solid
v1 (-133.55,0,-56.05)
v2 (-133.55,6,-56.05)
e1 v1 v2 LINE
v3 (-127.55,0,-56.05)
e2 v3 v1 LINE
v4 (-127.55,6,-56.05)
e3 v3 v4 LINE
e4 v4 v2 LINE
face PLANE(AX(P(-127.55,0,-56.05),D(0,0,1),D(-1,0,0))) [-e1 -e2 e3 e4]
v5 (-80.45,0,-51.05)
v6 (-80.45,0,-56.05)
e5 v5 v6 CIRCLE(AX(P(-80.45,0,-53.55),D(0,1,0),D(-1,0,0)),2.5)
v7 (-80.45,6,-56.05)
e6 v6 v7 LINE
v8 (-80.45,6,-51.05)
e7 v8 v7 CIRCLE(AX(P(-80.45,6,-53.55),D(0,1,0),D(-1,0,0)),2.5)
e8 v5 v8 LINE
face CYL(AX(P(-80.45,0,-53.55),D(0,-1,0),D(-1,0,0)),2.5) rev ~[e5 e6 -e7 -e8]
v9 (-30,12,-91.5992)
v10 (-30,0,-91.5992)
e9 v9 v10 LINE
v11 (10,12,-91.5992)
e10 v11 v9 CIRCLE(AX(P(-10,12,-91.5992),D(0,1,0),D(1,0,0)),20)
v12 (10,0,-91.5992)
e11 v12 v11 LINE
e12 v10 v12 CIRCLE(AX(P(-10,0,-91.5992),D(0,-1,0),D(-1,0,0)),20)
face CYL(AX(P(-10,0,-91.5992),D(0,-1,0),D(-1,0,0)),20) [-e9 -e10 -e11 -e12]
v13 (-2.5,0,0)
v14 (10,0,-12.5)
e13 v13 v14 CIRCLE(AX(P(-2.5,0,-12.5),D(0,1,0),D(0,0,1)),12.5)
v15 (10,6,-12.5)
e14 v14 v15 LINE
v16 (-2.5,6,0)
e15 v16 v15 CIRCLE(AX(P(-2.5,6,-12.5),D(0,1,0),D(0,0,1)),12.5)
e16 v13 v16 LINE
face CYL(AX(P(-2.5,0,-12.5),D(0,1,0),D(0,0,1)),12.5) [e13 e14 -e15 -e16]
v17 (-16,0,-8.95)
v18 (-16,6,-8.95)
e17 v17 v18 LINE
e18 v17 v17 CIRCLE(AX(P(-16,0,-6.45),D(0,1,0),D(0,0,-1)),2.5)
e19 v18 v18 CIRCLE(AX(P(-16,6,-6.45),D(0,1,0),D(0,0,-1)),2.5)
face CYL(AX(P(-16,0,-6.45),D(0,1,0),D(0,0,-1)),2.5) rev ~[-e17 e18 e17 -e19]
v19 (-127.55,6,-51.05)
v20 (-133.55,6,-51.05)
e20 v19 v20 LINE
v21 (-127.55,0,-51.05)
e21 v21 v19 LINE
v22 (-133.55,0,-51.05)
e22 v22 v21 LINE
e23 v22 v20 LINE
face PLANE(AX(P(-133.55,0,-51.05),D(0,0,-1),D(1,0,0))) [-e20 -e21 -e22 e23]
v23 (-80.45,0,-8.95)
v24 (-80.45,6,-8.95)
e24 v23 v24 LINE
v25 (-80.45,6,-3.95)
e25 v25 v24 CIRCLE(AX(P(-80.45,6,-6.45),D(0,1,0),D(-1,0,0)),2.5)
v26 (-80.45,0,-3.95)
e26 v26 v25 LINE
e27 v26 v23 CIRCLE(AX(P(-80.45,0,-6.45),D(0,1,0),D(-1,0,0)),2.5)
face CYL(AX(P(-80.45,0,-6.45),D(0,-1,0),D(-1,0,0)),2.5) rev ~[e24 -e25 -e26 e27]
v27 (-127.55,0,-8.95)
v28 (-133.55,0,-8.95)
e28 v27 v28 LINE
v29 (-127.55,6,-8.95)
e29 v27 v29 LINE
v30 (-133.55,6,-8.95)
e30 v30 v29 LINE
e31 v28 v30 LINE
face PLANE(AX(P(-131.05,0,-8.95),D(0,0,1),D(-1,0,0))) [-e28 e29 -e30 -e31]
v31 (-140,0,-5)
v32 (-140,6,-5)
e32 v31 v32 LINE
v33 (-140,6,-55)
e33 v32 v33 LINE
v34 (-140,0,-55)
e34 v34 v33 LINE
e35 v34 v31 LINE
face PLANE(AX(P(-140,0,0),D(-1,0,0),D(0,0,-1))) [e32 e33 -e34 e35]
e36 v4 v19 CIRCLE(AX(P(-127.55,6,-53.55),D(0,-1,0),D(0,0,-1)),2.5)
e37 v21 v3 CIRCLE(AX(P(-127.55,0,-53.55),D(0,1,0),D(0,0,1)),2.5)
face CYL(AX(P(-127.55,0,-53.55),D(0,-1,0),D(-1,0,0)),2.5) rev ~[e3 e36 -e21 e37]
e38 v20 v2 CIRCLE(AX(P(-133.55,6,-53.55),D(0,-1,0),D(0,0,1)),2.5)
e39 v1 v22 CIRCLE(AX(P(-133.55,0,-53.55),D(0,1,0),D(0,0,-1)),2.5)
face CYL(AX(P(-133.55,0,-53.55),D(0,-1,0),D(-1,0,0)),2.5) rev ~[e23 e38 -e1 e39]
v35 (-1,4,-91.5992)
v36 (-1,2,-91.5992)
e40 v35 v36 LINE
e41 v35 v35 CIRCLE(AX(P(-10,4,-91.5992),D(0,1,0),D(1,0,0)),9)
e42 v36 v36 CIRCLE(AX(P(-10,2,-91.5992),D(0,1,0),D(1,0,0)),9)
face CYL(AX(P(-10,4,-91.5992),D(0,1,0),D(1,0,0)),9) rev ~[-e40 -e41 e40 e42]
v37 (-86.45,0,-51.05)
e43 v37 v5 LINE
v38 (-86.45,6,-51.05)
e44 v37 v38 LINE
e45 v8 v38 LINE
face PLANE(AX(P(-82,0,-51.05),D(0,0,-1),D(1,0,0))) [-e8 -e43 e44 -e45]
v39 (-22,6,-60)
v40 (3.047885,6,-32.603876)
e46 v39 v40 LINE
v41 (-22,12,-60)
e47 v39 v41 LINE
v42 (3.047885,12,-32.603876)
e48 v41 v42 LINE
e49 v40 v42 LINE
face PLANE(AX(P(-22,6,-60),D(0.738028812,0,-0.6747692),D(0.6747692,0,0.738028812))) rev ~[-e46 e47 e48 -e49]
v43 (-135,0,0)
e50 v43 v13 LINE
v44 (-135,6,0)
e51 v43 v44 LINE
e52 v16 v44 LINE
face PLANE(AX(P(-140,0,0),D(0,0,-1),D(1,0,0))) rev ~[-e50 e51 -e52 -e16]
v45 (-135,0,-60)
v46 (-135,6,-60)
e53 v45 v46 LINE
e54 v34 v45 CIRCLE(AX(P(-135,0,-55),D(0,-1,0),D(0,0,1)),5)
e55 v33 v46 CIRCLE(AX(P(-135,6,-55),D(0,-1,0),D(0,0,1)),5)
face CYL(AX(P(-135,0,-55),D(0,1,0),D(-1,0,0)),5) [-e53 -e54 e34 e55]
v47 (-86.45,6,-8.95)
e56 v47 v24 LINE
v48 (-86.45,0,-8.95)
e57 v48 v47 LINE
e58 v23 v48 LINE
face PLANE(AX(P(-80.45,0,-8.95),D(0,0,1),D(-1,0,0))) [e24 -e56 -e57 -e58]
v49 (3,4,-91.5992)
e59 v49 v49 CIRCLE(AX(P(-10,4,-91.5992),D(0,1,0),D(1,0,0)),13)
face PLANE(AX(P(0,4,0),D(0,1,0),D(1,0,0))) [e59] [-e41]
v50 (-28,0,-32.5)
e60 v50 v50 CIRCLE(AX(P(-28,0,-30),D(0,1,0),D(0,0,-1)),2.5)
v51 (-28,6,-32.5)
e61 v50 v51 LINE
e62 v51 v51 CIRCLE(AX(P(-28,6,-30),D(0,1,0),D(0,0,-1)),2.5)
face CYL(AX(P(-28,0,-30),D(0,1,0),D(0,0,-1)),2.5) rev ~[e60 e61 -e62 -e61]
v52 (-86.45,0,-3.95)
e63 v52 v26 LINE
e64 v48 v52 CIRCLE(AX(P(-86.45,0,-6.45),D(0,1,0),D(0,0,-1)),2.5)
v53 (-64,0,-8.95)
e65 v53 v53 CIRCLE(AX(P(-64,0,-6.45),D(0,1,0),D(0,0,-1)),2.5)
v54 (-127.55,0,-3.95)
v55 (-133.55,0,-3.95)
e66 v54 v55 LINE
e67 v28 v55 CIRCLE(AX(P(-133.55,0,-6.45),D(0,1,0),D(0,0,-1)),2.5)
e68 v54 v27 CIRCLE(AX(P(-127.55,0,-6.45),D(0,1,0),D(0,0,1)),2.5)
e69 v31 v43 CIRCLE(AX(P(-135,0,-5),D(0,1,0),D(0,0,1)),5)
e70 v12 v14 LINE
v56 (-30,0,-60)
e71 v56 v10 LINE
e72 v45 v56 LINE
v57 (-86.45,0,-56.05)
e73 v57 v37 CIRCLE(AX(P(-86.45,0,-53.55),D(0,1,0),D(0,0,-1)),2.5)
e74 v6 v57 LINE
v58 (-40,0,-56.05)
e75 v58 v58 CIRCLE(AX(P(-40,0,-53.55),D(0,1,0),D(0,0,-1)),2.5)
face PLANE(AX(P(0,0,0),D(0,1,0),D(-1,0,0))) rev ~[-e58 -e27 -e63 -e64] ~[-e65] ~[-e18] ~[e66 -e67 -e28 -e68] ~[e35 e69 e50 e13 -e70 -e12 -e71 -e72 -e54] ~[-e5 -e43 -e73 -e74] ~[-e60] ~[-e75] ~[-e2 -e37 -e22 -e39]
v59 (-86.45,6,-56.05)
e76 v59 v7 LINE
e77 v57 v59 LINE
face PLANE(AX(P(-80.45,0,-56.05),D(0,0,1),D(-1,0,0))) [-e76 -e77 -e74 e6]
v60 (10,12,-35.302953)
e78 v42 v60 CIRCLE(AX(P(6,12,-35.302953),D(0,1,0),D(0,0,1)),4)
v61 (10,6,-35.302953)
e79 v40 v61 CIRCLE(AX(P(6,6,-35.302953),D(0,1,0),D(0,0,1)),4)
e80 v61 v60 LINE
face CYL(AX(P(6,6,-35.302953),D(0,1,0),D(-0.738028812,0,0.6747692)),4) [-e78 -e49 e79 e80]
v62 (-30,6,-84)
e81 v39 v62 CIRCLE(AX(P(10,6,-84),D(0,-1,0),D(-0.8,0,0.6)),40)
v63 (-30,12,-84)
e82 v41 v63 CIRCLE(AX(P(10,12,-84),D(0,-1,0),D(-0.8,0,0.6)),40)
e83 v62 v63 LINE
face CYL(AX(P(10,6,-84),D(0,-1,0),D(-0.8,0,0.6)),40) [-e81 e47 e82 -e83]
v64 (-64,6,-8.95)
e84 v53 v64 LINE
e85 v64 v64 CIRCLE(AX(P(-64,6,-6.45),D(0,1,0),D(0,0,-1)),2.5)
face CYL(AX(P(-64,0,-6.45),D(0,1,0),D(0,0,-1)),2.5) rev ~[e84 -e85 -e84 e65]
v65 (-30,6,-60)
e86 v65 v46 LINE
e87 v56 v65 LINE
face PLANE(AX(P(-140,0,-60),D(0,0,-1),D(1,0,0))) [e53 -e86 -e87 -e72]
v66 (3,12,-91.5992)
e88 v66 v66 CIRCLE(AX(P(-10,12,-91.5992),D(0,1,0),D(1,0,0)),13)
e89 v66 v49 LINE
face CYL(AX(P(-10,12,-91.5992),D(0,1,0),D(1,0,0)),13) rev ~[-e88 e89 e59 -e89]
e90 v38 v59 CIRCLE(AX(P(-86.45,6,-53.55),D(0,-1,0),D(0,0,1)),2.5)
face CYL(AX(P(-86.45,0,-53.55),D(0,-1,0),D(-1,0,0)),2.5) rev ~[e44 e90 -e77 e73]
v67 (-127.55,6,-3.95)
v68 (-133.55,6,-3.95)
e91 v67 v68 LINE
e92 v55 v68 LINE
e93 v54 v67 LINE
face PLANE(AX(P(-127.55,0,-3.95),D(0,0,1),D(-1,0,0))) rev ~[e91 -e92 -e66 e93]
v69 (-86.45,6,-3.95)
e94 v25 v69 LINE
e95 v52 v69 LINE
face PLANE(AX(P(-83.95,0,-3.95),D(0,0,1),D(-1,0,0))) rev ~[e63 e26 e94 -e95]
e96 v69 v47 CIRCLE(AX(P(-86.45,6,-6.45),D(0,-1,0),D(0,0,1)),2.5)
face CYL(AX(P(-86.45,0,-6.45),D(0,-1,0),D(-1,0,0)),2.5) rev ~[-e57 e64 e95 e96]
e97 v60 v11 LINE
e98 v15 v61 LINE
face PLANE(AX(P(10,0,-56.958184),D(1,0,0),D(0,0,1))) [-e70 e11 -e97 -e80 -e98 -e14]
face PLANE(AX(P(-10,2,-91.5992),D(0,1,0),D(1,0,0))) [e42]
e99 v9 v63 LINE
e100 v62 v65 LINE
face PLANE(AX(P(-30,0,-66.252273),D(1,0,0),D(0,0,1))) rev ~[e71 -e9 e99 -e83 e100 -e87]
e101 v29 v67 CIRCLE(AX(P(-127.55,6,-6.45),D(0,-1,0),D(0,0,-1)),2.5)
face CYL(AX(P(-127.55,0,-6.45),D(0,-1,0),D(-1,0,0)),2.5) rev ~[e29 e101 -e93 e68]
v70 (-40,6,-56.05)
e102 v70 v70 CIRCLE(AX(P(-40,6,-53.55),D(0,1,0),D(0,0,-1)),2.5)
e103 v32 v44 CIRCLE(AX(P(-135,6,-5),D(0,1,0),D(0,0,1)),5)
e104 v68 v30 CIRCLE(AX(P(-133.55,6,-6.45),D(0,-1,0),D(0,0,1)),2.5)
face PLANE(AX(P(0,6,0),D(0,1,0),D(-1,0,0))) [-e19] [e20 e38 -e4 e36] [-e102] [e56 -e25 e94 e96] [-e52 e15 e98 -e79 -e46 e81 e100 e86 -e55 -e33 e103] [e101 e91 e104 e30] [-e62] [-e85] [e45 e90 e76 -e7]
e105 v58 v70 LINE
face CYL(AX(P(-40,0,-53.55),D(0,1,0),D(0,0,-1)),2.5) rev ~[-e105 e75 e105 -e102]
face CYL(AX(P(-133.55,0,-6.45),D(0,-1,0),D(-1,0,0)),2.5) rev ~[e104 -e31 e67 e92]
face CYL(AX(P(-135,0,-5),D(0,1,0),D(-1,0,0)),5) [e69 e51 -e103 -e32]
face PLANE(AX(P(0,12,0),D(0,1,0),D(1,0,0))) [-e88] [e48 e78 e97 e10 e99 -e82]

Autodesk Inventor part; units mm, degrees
ref_plane "YZ Plane" through (0, 0, 0) normal (1, 0, 0) x (0, 1, 0)
ref_plane "XZ Plane" through (0, 0, 0) normal (0, 1, 0) x (-1, 0, 0)
ref_plane "XY Plane" through (0, 0, 0) normal (0, 0, 1) x (1, 0, 0)
sketch "Sketch1" plane through (0, 0, 0) normal (0, 1, 0) x (-1, 0, 0)
  line L0 (140, 0) -> (74, 0)
  line L1 (74, 0) -> (76, 0)
  line L2 (140, 0) -> (140, -60)
  line L3 (140, -60) -> (140, 0)
  line L4 (138, -58) -> (82, -2)
  line L5 (82, -58) -> (138, -2)
  line L6 (110, -30) -> (110, -49.4)
  line L7 (86.45, -6.45) -> (86.45, -53.55)
  line L8 (82, -58) -> (82, -2)
  line L9 (76, -58) -> (76, -2)
  line L10 (74, 0) -> (74, -60)
  line L11 (74, 0) -> (74, -60)
  circle A0 centre (86.45, -6.45) radius 2.5
  line L12 (76, -2) -> (138, -2)
  line L13 (80.45, -8.95) -> (133.55, -8.95)
  line L14 (80.45, -3.95) -> (133.55, -3.95)
  line L15 (133.55, -6.45) -> (86.45, -6.45)
  line L16 (82, -2) -> (138, -2)
  line L17 (104, -10.6) -> (110, -10.6)
  line L18 (138, -2) -> (138, -58)
  line L19 (138, -2) -> (138, -58)
  line L20 (133.55, -53.55) -> (133.55, -6.45)
  line L21 (140, -60) -> (138, -60)
  line L22 (138, -60) -> (138, -58)
  line L23 (138, -58) -> (140, -58)
  line L24 (140, -58) -> (140, -60)
  line L25 (104, -49.4) -> (110, -49.4)
  circle A1 centre (86.45, -53.55) radius 2.5
  line L26 (133.55, -51.05) -> (80.45, -51.05)
  line L27 (86.45, -53.55) -> (133.55, -53.55)
  line L28 (80.45, -56.05) -> (133.55, -56.05)
  line L29 (138, -58) -> (82, -58)
  line L30 (138, -58) -> (76, -58)
  line L31 (74, -60) -> (140, -60)
  line L32 (140, -60) -> (32, -60)
  circle A2 centre (127.55, -53.55) radius 2.5
  line L33 (104, -30) -> (104, -49.4)
  circle A3 centre (80.45, -6.45) radius 2.5
  line L34 (86.45, -53.55) -> (82, -53.55)
  line L35 (82, -58) -> (86.45, -58)
  line L36 (86.45, -58) -> (86.45, -53.55)
  line L37 (82, -53.55) -> (82, -58)
  circle A4 centre (80.45, -53.55) radius 2.5
  circle A5 centre (133.55, -53.55) radius 2.5
  line L38 (76, 0) -> (76, -2)
  line L39 (76, -2) -> (74, -2)
  line L40 (74, -2) -> (74, 0)
  line L41 (138, -2) -> (133.55, -2)
  line L42 (133.55, -2) -> (133.55, -6.45)
  line L43 (133.55, -6.45) -> (138, -6.45)
  line L44 (138, -6.45) -> (138, -2)
  circle A6 centre (127.55, -6.45) radius 2.5
  circle A7 centre (133.55, -6.45) radius 2.5
  line L45 (0, -25) -> (0, 0)
  line L46 (32, -60) -> (0, -25)
  line L47 (0, -25) -> (0, 0)
  line L48 (0, 0) -> (74, 0)
  line L49 (0, 0) -> (74, 0)
  line L50 (140, -60) -> (140, 0)
  line L51 (140, -60) -> (0, -60)
  line L52 (0, -60) -> (0, 0)
  line L53 (0, 0) -> (140, 0)
  line L54 (140, 0) -> (140, -60)
  line L55 (0, -60) -> (40, -60)
  line L56 (40, -60) -> (40, -100)
  line L57 (40, -100) -> (0, -100)
  line L58 (0, -100) -> (0, -60)
  line L59 (140, 0) -> (74, 0)
  line L60 (74, 0) -> (76, 0)
  line L61 (140, 0) -> (140, -60)
  line L62 (140, -60) -> (140, 0)
  line L63 (138, -58) -> (82, -2)
  line L64 (82, -58) -> (138, -2)
  circle A8 centre (110, -30) radius 19.4
  circle A9 centre (104, -30) radius 19.4
  line L65 (110, -30) -> (110, -49.4)
  line L66 (86.45, -6.45) -> (86.45, -53.55)
  line L67 (82, -58) -> (82, -2)
  line L68 (76, -58) -> (76, -2)
  line L69 (74, 0) -> (74, -60)
  line L70 (74, 0) -> (74, -60)
  circle A10 centre (86.45, -6.45) radius 2.5
  line L71 (76, -2) -> (138, -2)
  line L72 (80.45, -8.95) -> (133.55, -8.95)
  line L73 (80.45, -3.95) -> (133.55, -3.95)
  line L74 (133.55, -6.45) -> (86.45, -6.45)
  line L75 (82, -2) -> (138, -2)
  line L76 (104, -10.6) -> (110, -10.6)
  line L77 (138, -2) -> (138, -58)
  line L78 (138, -2) -> (138, -58)
  line L79 (133.55, -53.55) -> (133.55, -6.45)
  line L80 (140, -60) -> (138, -60)
  line L81 (138, -60) -> (138, -58)
  line L82 (138, -58) -> (140, -58)
  line L83 (140, -58) -> (140, -60)
  line L84 (104, -49.4) -> (110, -49.4)
  circle A11 centre (86.45, -53.55) radius 2.5
  line L85 (133.55, -51.05) -> (80.45, -51.05)
  line L86 (86.45, -53.55) -> (133.55, -53.55)
  line L87 (80.45, -56.05) -> (133.55, -56.05)
  line L88 (138, -58) -> (82, -58)
  line L89 (138, -58) -> (76, -58)
  line L90 (74, -60) -> (140, -60)
  line L91 (140, -60) -> (32, -60)
  circle A12 centre (127.55, -53.55) radius 2.5
  line L92 (104, -30) -> (104, -49.4)
  circle A13 centre (80.45, -6.45) radius 2.5
  line L93 (86.45, -53.55) -> (82, -53.55)
  line L94 (82, -58) -> (86.45, -58)
  line L95 (86.45, -58) -> (86.45, -53.55)
  line L96 (82, -53.55) -> (82, -58)
  circle A14 centre (80.45, -53.55) radius 2.5
  circle A15 centre (133.55, -53.55) radius 2.5
  line L97 (76, 0) -> (76, -2)
  line L98 (76, -2) -> (74, -2)
  line L99 (74, -2) -> (74, 0)
  line L100 (138, -2) -> (133.55, -2)
  line L101 (133.55, -2) -> (133.55, -6.45)
  line L102 (133.55, -6.45) -> (138, -6.45)
  line L103 (138, -6.45) -> (138, -2)
  circle A16 centre (127.55, -6.45) radius 2.5
  circle A17 centre (133.55, -6.45) radius 2.5
  line L104 (0, -25) -> (0, 0)
  line L105 (32, -60) -> (0, -25)
  line L106 (0, -25) -> (0, 0)
  line L107 (0, 0) -> (74, 0)
  line L108 (0, 0) -> (74, 0)
  line L109 (140, -60) -> (140, 0)
  line L110 (140, -60) -> (0, -60)
  line L111 (0, -60) -> (0, 0)
  line L112 (0, 0) -> (140, 0)
  line L113 (140, 0) -> (140, -60)
  line L114 (0, -60) -> (40, -60)
  line L115 (40, -60) -> (40, -100)
  line L116 (40, -100) -> (0, -100)
  line L117 (0, -100) -> (0, -60)
  line L118 (40, -100) -> (0, -60)
  line L119 (40, -60) -> (0, -100)
  circle A18 centre (104, -30) radius 10.5
  line L120 (0, -68.6498) -> (0, 0)
  line L121 (20, -80) -> (20, -180)
  line L122 (104, -30) -> (-49.3689, -120.7578)
  circle A19 centre (20, -80) radius 17
  line L123 (20, -134.4641) -> (10, -134.4641)
  line L124 (10, -134.4641) -> (10, -50)
  line L125 (10, -50) -> (20, -50)
  line L126 (20, -50) -> (20, -134.4641)
  circle A20 centre (10, -91.5992) radius 40
  circle A21 centre (10, -91.5992) radius 20
  line L127 (10, -95.8192) -> (-10, -95.8192)
  line L128 (-10, -95.8192) -> (-10, 0)
  line L129 (-10, 0) -> (10, 0)
  line L130 (10, 0) -> (10, -95.8192)
  line L131 (-10, -95.8192) -> (30, -95.8192)
  line L132 (30, -95.8192) -> (30, 0)
  line L133 (30, 0) -> (-10, 0)
  line L134 (-10, 0) -> (-10, -95.8192)
  line L135 (10, -95.8192) -> (10, -91.5992)
  line L136 (10, -91.5992) -> (9.1265, -91.5992)
  point P0 (127.55, 3.95)
  point P1 (127.55, 8.95)
  point P2 (86.45, 3.95)
  point P3 (86.45, 8.95)
  point P4 (127.55, 56.05)
  point P5 (127.55, 51.05)
  point P6 (86.45, 56.05)
  point P7 (86.45, 51.05)
  point P8 (123.7179, -16.2821)
  point P9 (131.05, -8.95)
  point P10 (88.95, -8.95)
  point P11 (88.2178, -8.2178)
  point P12 (86.45, -8.95)
  point P13 (82, -3.95)
  point P14 (135.3178, -55.3178)
  point P15 (127.55, -56.05)
  point P16 (127.55, -51.05)
  point P17 (131.05, -51.05)
  point P18 (123.7179, -43.7179)
  point P19 (86.45, -51.05)
  point P20 (86.45, -56.05)
  point P21 (86.45, -3.95)
  point P22 (127.55, -8.95)
  point P23 (127.55, -3.95)
  point P24 (86.45, -8.95)
  point P25 (86.45, -3.95)
  point P26 (127.55, -56.05)
  point P27 (127.55, -51.05)
  point P28 (127.55, -8.95)
  point P29 (127.55, -3.95)
  point P30 (86.45, -51.05)
  point P31 (86.45, -56.05)
  point P32 (127.55, 3.95)
  point P33 (127.55, 8.95)
  point P34 (86.45, 3.95)
  point P35 (86.45, 8.95)
  point P36 (127.55, 56.05)
  point P37 (127.55, 51.05)
  point P38 (86.45, 56.05)
  point P39 (86.45, 51.05)
  point P40 (123.7179, -16.2821)
  point P41 (131.05, -8.95)
  point P42 (88.95, -8.95)
  point P43 (88.2178, -8.2178)
  point P44 (86.45, -8.95)
  point P45 (82, -3.95)
  point P46 (135.3178, -55.3178)
  point P47 (127.55, -56.05)
  point P48 (127.55, -51.05)
  point P49 (131.05, -51.05)
  point P50 (123.7179, -43.7179)
  point P51 (86.45, -51.05)
  point P52 (86.45, -56.05)
  point P53 (86.45, -3.95)
  point P54 (127.55, -8.95)
  point P55 (127.55, -3.95)
  point P56 (30, -60)
  point P57 (88.95, -51.05)
  point P58 (88.2178, -51.7822)
  point P59 (88.2178, -8.2178)
  point P60 (88.95, -8.95)
  point P61 (-10, -91.5992)
  point P62 (30, -91.5992)
  point P63 (30, -60)
  point P64 (104.0094, -10.6)
  point P65 (109.9957, -10.6)
  dimension "d0" = 40
  dimension "d1" = 40
  dimension "d43" = 40
  dimension "d44" = 40
  dimension "d45" = 21
  dimension "d46" = 100
  dimension "d47" = 34
  dimension "d48" = 10
  dimension "d49" = 80
  dimension "d50" = 40
  dimension "d51" = 20
  dimension "d81" = 4.22
extrude "Extrusion5" add sketch "Sketch1" along normal blind 6 contours L2 L23 L18 L12 L38 L0 | L38 L39 L10 L0 | L2 L21 L22 L23 | L10 L122 L32 A20 L132 L48 | L12 L8 L14 A3 L13 L122 L9 | L9 L122 L10 L39 | L29 L36 L28 A5 L4 | L4 A5 L20 A7 L43 L18 | L22 L31 L10 L122 L9 L30 L29 | L132 A20 L46 L130 L48 | L122 L8 L26 A4 L28 L30 L9 | L12 L42 L14 L4 | L4 L14 L8 | L43 A7 L5 L18 | L29 L5 L28 L36 | L10 L32 L122 | L130 L46 L45 L48 | L132 L46 A20 | A20 L32 L46 L132 | L122 L7 L26 L8 | L8 L13 L7 A9 L122 | L12 L5 A7 L42 | L8 L28 L5 | A1 L27 A2 L28 | L45 L52 A20 L128 L129 | L130 L124 A20 L52 L46 | L46 A20 L126 L125 L130 | L46 L132 L51 L126 A20 | L46 L51 L132 | L122 A9 L5 L26 L7 | L7 A9 L122 | L14 A6 L15 A0 | L26 L4 A8 L5 L13 L20 | A1 L5 L26 A2 L27 | L125 L126 A20 L124 | L126 L51 L124 A20 | L132 A19 L126 L51 | L26 L5 A1 | L13 L4 A9 L7 | A0 L4 L13 | A9 L7 | L7 A9 L4 A8 L122 | L122 A8 L5 A9 | L15 A6 L13 L4 A0 | L26 L5 A9 L25 A8 L4 | L5 A8 L17 A9 L4 L13 | A20 L124 L51 L52 | L52 L58 A21 L128 A20 | L126 A19 L124 L51 | L132 L119 A21 L126 A19 | L5 A8 L33 A9 | L122 A18 L5 A8 | A8 L4 A18 L122 | A8 L6 A9 L4 | L4 A9 L5 A8 | L5 A9 A8 | L118 A19 A21 L58 | L51 L124 A19 L118 | A21 L58 L122 L127 | L132 L122 A21 L119 | L126 A21 L118 L124 A19 | A9 A8 L4 | L5 A18 L33 A8 | A9 A8 L25 | L33 A8 A9 | A8 A9 L5 A18 L4 | L122 L33 L5 A18 | A18 L4 L5 L33 L122 | A9 L6 A18 L4 | L4 A18 L5 A9 | A8 A9 L6 | A8 A9 L17 | A21 L121 L57 | L57 L121 A19 L131 A21 | L132 L118 A21 L122 | A21 L124 L57 L121 | A19 L124 L118 | L118 L124 A21 A19 | A21 L127 L122 | L122 L127 L58 L57 L124 A21 | A21 A19 L122 L58 | A21 L122 L119 | L119 L122 L126 A21 | L126 L122 L118 A21 | L5 L33 A18 | L33 A18 L6 A9 A8 | A18 L5 L4 | A18 L6 L4 | L4 L5 A18 | L57 L124 L131 A19 L121 | L131 A19 A21 | L132 A21 L118 | A21 L118 L119 L122 | L118 A21 L124 | A21 L124 L122 A19 | L122 L58 L127 | L122 A19 L119 L127 L58 | L119 L126 L122 | L126 L118 L122 | L118 L122 L124 A21 | L5 L6 A18 L33 | L57 L119 L127 L124 | A19 L131 L121 | L121 L131 A19 | A19 L131 L121 L118 A21 | L122 L124 L119 A19 | L127 L119 L58 | L119 L124 L122 L118 | L121 L131 A19 L124 L119 | L127 L119 A19 L124 | L124 A19 L131 | L119 L124 A19
sketch "Sketch7" plane through (0, 6, 0) normal (0, 1, 0) x (1, 0, 0)
  line L0 (0, 0) -> (-140, 0)
  line L1 (-32, 0) -> (0, 0)
  line L2 (-140, 0) -> (-140, 60)
  line L3 (-140, 60) -> (-32, 60)
  line L4 (0, 25) -> (0, 0)
  line L5 (0, 0) -> (0, 25)
  line L6 (0, 0) -> (0, 25)
  line L7 (0, 25) -> (-32, 60)
  line L8 (-32, 60) -> (10, 14.0625)
  line L9 (10, 0) -> (10, 91.5992) projected
  arc A0 (10, 91.5992) -> (-30, 91.5992) centre (-10, 91.5992) ccw projected
  circle A1 centre (-10, 91.5992) radius 20
  line L10 (-30, 91.5992) -> (-30, 60) projected
  line L11 (-30, 91.5992) -> (-30, 60)
  line L12 (-30, 60) -> (-32, 60)
  line L13 (10, 91.5992) -> (10, 14.0625)
  line L14 (0, 25) -> (0, 0)
  line L15 (135, 0) -> (-10, 0)
  line L16 (-10, 0) -> (0, 0)
  line L17 (0, 0) -> (0, 25)
  line L18 (10, 25) -> (10, 0)
  line L19 (-32, 60) -> (-22, 60)
  line L20 (-22, 60) -> (10, 25)
  line L21 (-69, 60) -> (-32, 60)
  line L22 (0, 25) -> (-32, 60)
  point P0 (6.0531, 31.6206)
fillet "Fillet10" radius 5 2 edges at (-140, 3, -60) (-140, 3, 0)
fillet "Fillet11" radius 12.5 1 edges at (10, 3, 0)
sketch "Sketch10" plane through (0, 0, 0) normal (0, -1, 0) x (1, 0, 0)
  line L0 (74, 60) -> (0, 60)
  line L1 (0, 60) -> (0, 0)
  line L2 (0, 0) -> (74, 0)
  line L3 (74, 0) -> (74, 60)
  arc A0 (80.45, 8.95) -> (80.45, 3.95) centre (80.45, 6.45) ccw
  line L4 (80.45, 6.45) -> (0, 6.45)
  arc A1 (80.45, 56.05) -> (80.45, 51.05) centre (80.45, 53.55) ccw
  line L5 (80.45, 53.55) -> (0, 53.55)
  line L6 (0, 20) -> (0, 80)
  line L7 (74, 18.2674) -> (74, 55)
  line L8 (74, 53.55) -> (64, 53.55)
  line L9 (64, 53.55) -> (64, 6.45)
  line L10 (64, 53.55) -> (40, 53.55)
  line L11 (64, 6.45) -> (40, 6.45)
  line L12 (40, 6.45) -> (16, 6.45)
  line L13 (16, 6.45) -> (40, 53.55)
  line L14 (40, 53.55) -> (28.6497, 31.2751)
  arc A2 (104, 49.4) -> (98.7489, 11.3242) centre (104, 30) ccw
  line L15 (104, 30) -> (28, 30)
  line L16 (-53.55, 64) -> (-53.55, 40)
  line L17 (-18.2674, 74) -> (-55, 74)
  line L18 (-30, 104) -> (-30, 28)
  line L19 (-53.55, 40) -> (-31.2751, 28.6497)
  line L20 (-53.55, 64) -> (-6.45, 64)
  line L21 (0, 74) -> (-60, 74)
  line L22 (-6.45, 64) -> (-6.45, 40)
  line L23 (-60, 74) -> (-60, 0)
  line L24 (-53.55, 80.45) -> (-53.55, 0)
  line L25 (-6.45, 80.45) -> (-6.45, 0)
  line L26 (0, 0) -> (0, 74)
  line L27 (-6.45, 40) -> (-6.45, 16)
  line L28 (-6.45, 16) -> (-53.55, 40)
  line L29 (-60, 0) -> (0, 0)
  arc A3 (-56.05, 80.45) -> (-51.05, 80.45) centre (-53.55, 80.45) ccw
  line L30 (-53.55, 74) -> (-53.55, 64)
  arc A4 (-8.95, 80.45) -> (-3.95, 80.45) centre (-6.45, 80.45) ccw
  line L31 (-20, 0) -> (-80, 0)
  arc A5 (-49.4, 104) -> (-11.3242, 98.7489) centre (-30, 104) ccw
  line L32 (-64, -53.55) -> (-40, -53.55)
  line L33 (-74, -18.2674) -> (-74, -55)
  line L34 (-104, -30) -> (-28, -30)
  line L35 (-40, -53.55) -> (-28.6497, -31.2751)
  line L36 (-64, -53.55) -> (-64, -6.45)
  line L37 (-74, 0) -> (-74, -60)
  line L38 (-64, -6.45) -> (-40, -6.45)
  line L39 (-74, -60) -> (0, -60)
  line L40 (-80.45, -53.55) -> (0, -53.55)
  line L41 (-80.45, -6.45) -> (0, -6.45)
  line L42 (0, 0) -> (-74, 0)
  line L43 (-40, -6.45) -> (-16, -6.45)
  line L44 (-16, -6.45) -> (-40, -53.55)
  line L45 (0, -60) -> (0, 0)
  arc A6 (-80.45, -56.05) -> (-80.45, -51.05) centre (-80.45, -53.55) ccw
  line L46 (-74, -53.55) -> (-64, -53.55)
  arc A7 (-80.45, -8.95) -> (-80.45, -3.95) centre (-80.45, -6.45) ccw
  line L47 (0, -20) -> (0, -80)
  arc A8 (-104, -49.4) -> (-98.7489, -11.3242) centre (-104, -30) ccw
  line L48 (53.55, -64) -> (53.55, -40)
  line L49 (18.2674, -74) -> (55, -74)
  line L50 (30, -104) -> (30, -28)
  line L51 (53.55, -40) -> (31.2751, -28.6497)
  line L52 (53.55, -64) -> (6.45, -64)
  line L53 (0, -74) -> (60, -74)
  line L54 (6.45, -64) -> (6.45, -40)
  line L55 (60, -74) -> (60, 0)
  line L56 (53.55, -80.45) -> (53.55, 0)
  line L57 (6.45, -80.45) -> (6.45, 0)
  line L58 (0, 0) -> (0, -74)
  line L59 (6.45, -40) -> (6.45, -16)
  line L60 (6.45, -16) -> (53.55, -40)
  line L61 (60, 0) -> (0, 0)
  arc A9 (56.05, -80.45) -> (51.05, -80.45) centre (53.55, -80.45) ccw
  line L62 (53.55, -74) -> (53.55, -64)
  arc A10 (8.95, -80.45) -> (3.95, -80.45) centre (6.45, -80.45) ccw
  line L63 (20, 0) -> (80, 0)
  arc A11 (49.4, -104) -> (11.3242, -98.7489) centre (30, -104) ccw
  dimension "d66" = 10
  dimension "d67" = 24
  dimension "d68" = 24
  dimension "d69" = 24
  dimension "d72" = 360
hole "Hole3" at (-40, 0, -53.55) at (-28, 0, -30) at (-16, 0, -6.45) at (-64, 0, -6.45) direction (0, 1, 0) diameter 5 end through all
extrude "Extrusion9" add sketch "Sketch7" along normal blind 6 contours L10 A1 L9 L20 L19 | A0 A1
sketch "Sketch11" plane through (0, 12, 0) normal (0, 1, 0) x (1, 0, 0)
  arc A0 (10, 91.5992) -> (-30, 91.5992) centre (-10, 91.5992) ccw projected
  circle A1 centre (-10, 91.5992) radius 13
  point P0 (0, 0)
  dimension "d89" = 26
extrude "Extrusion12" cut sketch "Sketch11" against normal blind 8
sketch "Sketch12" plane through (-10, 4, -91.5992) normal (0, 1, 0) x (1, 0, 0)
  circle A0 centre (0, 0) radius 9
  point P0 (10, -91.5992)
  dimension "d92" = 18
extrude "Extrusion13" cut sketch "Sketch12" against normal blind 2
fillet "Fillet13" radius 4 1 edges at (10, 9, -25)
fillet "Fillet14" radius 40 1 edges at (-30, 9, -60)
properties part number "duza_czesc_pokrywka"
